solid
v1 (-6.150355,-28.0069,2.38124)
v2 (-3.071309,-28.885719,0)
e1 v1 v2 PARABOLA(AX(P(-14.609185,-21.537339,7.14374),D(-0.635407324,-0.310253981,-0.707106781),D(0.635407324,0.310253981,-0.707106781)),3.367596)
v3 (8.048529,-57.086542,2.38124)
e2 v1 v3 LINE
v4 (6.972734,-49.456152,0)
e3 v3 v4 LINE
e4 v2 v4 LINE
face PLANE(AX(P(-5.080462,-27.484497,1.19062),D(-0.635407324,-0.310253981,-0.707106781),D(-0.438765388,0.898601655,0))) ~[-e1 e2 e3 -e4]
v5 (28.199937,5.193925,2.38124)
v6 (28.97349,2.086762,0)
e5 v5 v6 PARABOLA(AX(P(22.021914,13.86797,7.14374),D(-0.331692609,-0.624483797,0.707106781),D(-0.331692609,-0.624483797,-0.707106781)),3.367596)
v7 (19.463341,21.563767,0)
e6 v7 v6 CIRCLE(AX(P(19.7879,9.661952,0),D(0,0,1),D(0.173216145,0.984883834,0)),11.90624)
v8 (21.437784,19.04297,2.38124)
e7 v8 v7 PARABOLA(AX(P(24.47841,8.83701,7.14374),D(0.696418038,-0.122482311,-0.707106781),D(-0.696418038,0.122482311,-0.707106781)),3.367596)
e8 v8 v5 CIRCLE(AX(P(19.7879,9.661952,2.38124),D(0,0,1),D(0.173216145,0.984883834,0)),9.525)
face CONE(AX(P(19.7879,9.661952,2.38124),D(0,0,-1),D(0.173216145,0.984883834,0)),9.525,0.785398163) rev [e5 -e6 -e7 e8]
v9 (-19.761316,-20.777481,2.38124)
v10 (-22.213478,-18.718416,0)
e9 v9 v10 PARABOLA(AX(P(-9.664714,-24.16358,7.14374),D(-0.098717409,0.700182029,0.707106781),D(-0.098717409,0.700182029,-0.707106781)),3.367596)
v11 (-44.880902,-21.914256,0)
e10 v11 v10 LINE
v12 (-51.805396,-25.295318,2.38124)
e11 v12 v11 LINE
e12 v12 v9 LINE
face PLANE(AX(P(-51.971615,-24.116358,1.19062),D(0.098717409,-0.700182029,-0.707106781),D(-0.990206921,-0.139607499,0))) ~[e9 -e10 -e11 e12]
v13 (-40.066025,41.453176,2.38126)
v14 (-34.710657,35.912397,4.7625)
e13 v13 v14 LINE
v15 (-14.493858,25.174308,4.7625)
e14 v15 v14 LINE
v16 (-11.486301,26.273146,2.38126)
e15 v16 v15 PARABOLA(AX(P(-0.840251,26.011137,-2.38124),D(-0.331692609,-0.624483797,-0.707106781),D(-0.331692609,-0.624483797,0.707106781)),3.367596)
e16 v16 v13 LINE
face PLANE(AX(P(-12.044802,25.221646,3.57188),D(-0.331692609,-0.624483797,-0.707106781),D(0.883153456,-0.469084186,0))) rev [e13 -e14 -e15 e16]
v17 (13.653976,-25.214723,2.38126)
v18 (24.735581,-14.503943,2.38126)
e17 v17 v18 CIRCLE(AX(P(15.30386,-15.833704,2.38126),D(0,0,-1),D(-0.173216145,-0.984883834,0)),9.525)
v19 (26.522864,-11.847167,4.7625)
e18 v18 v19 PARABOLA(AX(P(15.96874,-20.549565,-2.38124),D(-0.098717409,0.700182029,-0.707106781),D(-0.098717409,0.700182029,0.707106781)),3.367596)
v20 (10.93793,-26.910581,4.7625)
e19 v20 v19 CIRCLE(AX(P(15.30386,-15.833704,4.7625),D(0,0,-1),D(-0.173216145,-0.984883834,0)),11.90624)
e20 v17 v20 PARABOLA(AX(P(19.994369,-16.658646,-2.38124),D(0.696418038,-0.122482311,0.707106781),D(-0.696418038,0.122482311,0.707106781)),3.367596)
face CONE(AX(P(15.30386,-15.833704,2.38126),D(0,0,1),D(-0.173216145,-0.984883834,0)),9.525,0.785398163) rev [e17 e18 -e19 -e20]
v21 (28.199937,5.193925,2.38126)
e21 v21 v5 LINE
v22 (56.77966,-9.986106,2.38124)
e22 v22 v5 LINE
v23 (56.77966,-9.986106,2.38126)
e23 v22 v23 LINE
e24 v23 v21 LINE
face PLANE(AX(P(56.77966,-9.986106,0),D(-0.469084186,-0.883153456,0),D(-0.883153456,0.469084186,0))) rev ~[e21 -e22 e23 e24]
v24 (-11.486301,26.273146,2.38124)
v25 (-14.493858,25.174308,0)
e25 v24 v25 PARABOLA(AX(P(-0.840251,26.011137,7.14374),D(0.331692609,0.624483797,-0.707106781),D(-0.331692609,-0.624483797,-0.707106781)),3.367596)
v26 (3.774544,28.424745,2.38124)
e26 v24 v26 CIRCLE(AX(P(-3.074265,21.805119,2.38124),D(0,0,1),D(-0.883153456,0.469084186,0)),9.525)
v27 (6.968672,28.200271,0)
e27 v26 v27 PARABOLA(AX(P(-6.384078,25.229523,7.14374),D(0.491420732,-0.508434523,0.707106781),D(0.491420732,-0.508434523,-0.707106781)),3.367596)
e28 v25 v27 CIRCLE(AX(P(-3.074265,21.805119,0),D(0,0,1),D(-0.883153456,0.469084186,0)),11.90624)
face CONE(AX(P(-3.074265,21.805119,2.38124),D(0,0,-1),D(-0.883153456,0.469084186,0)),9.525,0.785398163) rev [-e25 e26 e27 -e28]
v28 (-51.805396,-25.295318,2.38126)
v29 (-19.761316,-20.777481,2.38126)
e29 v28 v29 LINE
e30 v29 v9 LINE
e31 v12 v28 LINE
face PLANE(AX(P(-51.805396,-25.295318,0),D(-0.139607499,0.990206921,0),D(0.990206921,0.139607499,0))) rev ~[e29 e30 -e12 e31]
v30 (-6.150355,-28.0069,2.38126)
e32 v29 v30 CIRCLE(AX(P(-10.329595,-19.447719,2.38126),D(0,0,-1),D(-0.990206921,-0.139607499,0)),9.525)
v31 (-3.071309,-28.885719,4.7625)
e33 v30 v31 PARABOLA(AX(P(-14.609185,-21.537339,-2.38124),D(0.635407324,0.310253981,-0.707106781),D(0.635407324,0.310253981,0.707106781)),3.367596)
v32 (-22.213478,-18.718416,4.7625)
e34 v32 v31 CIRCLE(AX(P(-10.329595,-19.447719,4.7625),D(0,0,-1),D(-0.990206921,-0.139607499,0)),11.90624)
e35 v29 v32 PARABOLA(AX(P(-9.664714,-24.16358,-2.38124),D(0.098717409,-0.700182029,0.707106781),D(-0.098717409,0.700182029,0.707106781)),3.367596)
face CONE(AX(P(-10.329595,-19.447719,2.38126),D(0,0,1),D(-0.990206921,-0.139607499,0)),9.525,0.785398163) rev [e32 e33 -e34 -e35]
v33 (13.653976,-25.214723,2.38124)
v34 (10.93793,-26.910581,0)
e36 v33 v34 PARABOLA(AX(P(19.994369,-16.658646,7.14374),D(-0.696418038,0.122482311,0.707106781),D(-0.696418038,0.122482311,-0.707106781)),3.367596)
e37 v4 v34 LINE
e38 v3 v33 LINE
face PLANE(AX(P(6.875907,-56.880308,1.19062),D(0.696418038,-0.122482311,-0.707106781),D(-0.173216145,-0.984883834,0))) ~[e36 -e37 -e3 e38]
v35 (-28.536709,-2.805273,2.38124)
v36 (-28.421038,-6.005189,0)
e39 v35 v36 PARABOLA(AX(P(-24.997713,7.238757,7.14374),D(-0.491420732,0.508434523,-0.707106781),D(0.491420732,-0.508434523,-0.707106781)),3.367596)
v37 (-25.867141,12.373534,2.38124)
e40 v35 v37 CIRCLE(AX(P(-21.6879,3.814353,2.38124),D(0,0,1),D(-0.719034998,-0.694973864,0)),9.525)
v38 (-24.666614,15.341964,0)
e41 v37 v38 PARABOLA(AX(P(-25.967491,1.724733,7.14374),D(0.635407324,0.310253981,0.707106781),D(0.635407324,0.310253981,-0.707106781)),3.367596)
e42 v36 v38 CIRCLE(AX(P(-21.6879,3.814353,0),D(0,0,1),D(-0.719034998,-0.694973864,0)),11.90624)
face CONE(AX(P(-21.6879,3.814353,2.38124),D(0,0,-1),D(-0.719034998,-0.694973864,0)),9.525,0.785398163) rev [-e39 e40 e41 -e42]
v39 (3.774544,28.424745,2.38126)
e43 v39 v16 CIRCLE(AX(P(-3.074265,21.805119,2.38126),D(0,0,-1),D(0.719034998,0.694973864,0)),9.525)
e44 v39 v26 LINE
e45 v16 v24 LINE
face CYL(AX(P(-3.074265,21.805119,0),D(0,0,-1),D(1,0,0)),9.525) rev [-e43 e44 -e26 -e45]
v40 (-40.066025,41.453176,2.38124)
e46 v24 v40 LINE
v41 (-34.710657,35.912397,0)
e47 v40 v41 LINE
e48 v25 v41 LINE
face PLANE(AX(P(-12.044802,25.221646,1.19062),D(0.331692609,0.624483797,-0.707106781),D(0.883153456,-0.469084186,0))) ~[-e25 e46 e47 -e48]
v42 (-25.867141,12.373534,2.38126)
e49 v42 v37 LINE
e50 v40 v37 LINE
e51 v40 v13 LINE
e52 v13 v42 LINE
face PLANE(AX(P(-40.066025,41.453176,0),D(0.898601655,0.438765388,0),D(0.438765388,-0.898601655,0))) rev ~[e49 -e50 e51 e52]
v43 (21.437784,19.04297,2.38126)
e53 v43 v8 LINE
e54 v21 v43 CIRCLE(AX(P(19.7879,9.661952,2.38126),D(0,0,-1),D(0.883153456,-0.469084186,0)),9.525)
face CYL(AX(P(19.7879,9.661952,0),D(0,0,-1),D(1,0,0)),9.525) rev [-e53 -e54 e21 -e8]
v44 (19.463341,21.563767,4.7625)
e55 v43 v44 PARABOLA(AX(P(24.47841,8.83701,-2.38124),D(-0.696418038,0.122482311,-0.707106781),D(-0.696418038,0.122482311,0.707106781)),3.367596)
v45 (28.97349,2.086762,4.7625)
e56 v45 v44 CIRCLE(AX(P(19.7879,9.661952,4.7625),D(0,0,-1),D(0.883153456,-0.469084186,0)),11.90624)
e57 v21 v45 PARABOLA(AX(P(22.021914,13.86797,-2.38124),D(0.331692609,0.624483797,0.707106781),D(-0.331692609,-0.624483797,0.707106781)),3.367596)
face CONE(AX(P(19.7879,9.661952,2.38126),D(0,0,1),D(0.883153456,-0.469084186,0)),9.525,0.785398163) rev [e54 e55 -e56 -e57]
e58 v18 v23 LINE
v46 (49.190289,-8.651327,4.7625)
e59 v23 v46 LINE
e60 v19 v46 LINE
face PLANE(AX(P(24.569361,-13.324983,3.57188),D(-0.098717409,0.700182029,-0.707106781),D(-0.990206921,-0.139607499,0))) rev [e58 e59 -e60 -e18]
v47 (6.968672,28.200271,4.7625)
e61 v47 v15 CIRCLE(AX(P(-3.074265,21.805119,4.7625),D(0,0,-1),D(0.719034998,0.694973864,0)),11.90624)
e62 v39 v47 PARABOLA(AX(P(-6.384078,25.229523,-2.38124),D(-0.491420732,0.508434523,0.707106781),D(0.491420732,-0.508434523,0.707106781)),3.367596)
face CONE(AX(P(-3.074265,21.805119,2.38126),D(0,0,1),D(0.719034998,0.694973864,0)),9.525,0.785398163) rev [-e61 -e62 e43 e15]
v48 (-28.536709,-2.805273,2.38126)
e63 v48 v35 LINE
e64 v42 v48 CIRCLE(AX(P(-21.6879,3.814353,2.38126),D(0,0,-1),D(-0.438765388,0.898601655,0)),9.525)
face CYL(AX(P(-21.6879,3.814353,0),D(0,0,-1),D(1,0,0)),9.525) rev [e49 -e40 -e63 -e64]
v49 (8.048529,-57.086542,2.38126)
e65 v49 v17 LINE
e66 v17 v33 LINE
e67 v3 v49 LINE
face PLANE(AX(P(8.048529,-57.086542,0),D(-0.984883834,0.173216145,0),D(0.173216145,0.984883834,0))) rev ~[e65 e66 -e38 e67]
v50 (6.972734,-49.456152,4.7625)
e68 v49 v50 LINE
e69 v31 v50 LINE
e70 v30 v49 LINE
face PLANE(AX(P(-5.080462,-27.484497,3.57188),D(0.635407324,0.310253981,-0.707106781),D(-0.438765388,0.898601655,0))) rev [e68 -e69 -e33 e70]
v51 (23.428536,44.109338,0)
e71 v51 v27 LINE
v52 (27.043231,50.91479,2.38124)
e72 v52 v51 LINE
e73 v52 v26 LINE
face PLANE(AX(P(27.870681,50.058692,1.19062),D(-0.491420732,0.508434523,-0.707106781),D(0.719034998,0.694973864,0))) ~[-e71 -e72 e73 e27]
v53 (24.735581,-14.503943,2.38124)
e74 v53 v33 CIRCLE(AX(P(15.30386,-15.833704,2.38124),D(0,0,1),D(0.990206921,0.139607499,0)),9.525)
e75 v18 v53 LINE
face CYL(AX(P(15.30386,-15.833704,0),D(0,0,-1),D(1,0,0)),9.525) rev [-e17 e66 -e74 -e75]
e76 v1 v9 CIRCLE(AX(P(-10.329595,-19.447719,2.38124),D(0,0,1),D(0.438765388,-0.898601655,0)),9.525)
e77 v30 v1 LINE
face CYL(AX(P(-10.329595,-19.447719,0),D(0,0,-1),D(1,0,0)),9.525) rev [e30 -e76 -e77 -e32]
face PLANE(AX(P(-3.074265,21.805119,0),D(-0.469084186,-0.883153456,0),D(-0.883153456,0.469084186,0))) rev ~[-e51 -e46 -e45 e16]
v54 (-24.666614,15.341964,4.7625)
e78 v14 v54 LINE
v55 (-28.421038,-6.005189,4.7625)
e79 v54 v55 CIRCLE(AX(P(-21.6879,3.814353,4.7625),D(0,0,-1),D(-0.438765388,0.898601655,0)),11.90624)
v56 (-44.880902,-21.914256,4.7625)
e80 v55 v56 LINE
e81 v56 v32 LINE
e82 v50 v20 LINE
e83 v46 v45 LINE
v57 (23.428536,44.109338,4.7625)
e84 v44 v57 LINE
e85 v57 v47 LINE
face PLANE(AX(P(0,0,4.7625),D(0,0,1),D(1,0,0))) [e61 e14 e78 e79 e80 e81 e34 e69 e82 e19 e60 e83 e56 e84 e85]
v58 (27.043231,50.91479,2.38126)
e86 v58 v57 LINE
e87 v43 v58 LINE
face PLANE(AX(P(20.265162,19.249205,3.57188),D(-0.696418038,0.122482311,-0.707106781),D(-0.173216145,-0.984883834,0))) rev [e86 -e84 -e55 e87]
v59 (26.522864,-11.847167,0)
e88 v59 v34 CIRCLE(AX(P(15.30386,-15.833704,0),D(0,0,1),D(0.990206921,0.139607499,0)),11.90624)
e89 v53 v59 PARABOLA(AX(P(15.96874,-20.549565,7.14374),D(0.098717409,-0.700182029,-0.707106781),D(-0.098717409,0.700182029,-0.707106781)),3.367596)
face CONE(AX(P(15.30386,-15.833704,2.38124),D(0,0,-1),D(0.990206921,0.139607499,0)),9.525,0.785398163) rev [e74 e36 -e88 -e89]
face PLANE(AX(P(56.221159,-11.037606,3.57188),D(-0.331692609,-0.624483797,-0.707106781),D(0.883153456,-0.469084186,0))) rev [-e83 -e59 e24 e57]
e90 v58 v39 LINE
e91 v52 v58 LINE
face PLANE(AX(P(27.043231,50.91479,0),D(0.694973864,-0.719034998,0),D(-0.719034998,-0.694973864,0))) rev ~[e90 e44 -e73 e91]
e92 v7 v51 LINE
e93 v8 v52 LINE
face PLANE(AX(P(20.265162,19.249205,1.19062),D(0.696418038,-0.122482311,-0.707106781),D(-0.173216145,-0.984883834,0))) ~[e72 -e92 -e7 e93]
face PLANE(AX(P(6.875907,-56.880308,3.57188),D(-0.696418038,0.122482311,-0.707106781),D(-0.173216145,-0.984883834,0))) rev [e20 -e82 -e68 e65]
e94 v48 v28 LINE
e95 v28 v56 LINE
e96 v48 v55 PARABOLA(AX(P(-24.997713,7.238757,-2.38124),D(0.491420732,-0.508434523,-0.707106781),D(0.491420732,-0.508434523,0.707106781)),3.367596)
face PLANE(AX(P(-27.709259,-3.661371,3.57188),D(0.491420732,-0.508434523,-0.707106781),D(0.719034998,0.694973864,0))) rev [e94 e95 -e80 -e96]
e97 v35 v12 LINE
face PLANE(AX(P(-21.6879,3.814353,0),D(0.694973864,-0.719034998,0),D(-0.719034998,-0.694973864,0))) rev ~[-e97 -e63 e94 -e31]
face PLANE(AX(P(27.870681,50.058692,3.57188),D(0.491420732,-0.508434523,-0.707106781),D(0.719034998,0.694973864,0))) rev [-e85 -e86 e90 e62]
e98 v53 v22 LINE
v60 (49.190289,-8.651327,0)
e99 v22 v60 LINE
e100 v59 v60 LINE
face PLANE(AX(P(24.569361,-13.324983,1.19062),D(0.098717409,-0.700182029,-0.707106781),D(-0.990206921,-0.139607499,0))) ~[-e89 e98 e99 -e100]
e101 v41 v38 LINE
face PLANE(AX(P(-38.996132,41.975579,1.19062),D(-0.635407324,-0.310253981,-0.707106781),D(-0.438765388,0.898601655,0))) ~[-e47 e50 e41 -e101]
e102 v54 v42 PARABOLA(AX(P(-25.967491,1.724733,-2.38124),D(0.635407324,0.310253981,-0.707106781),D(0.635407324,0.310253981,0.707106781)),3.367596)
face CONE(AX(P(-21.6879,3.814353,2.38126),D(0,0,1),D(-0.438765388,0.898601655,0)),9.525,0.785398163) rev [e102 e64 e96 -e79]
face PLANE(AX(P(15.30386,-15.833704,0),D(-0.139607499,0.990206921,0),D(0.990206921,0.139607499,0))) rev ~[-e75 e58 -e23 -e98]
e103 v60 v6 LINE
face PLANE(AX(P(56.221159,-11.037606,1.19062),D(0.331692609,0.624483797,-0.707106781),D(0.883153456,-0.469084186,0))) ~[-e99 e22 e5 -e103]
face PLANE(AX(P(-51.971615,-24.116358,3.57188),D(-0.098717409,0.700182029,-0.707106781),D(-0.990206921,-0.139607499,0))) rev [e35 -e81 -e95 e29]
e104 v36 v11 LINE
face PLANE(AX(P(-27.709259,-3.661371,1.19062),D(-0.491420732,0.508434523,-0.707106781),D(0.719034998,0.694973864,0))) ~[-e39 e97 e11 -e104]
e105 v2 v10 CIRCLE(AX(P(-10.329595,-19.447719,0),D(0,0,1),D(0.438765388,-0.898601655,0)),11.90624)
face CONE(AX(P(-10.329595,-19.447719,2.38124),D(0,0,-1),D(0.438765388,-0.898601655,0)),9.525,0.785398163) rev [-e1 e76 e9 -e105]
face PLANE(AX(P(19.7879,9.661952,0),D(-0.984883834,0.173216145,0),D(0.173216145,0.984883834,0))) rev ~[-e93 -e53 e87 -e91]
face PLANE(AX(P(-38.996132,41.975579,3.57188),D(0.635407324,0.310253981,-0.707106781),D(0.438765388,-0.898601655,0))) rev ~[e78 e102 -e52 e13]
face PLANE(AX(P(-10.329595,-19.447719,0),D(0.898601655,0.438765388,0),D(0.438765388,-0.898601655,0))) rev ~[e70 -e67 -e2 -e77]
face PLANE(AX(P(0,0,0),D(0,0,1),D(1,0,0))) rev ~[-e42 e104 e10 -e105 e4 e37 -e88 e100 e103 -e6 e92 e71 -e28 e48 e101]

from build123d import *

# Parameters (mm, degrees)
F1_DEPTH = 4.7625
F2_R     = 9.525
F3_DEPTH = 4.7635
F4_SIZE  = 2.38124


# Not quite as in the source:
# - a fillet or chamfer is up to 0.001 mm smaller than in the source, because OpenCascade refuses the exact size
# - a feature of the source that left no trace in its solid (it failed there, or was rolled back) is left out


with BuildPart() as f1:
    # F0 (on Top) → F1 (new body)
    with BuildSketch(Plane.XY):
        Polygon((-3.074264621, 21.805118867), (-40.0660246394, 41.4531760826), (-21.6879004002, 3.8143528936), (-51.8053957451, -25.295317935), (-10.3295949709, -19.4477191337), (8.0485292683, -57.0865423226), (15.3038596181, -15.8337043219), (56.7796603923, -9.9861055206), (19.787900374, 9.6619516949), (27.0432307238, 50.9147896956), align=None)
    extrude(amount=F1_DEPTH)

    # F2 (on Top) → F3 (cut, through all)
    with BuildSketch(Plane.XY):
        with Locations((15.3038596181, -15.8337043219)):
            Circle(F2_R)
        with Locations((-10.3295949709, -19.4477191337)):
            Circle(F2_R)
        with Locations((-21.6879004002, 3.8143528936)):
            Circle(F2_R)
        with Locations((-3.074264621, 21.805118867)):
            Circle(F2_R)
        with Locations((19.787900374, 9.6619516949)):
            Circle(F2_R)
    extrude(amount=F3_DEPTH, mode=Mode.SUBTRACT)

    # F4 (size 2.38125 in the source; OpenCascade refuses exactly that, so slightly less here)
    f4_edges = [f1.edges().sort_by_distance(p)[0] for p in [
        (24.240507, 34.97888, 4.7625),
        (15.408887, 39.669767, 4.7625),
        (-1.744503, 12.373398, 4.7625),
        (-25.776163, 33.863161, 4.7625),
        (-32.966583, 26.913355, 4.7625),
        (-12.306882, 2.164469, 4.7625),
        (-40.171052, -14.050296, 4.7625),
        (-35.783356, -23.036399, 4.7625),
        (-5.861568, -11.035682, 4.7625),
        (0.949087, -42.546721, 4.7625),
        (10.851253, -41.150633, 4.7625),
        (8.684234, -8.984896, 4.7625),
        (40.75762, -12.245024, 4.7625),
        (42.489799, -2.39609, 4.7625),
        (11.22872, 5.482711, 4.7625),
        (24.240507, 34.97888, 0),
        (15.408887, 39.669767, 0),
        (-1.744503, 12.373398, 0),
        (-25.776163, 33.863161, 0),
        (-32.966583, 26.913355, 0),
        (-12.306882, 2.164469, 0),
        (-40.171052, -14.050296, 0),
        (-35.783356, -23.036399, 0),
        (-5.861568, -11.035682, 0),
        (0.949087, -42.546721, 0),
        (10.851253, -41.150633, 0),
        (8.684234, -8.984896, 0),
        (40.75762, -12.245024, 0),
        (42.489799, -2.39609, 0),
        (11.22872, 5.482711, 0),
    ]]
    chamfer(f4_edges, length=F4_SIZE)


solid = f1.part
